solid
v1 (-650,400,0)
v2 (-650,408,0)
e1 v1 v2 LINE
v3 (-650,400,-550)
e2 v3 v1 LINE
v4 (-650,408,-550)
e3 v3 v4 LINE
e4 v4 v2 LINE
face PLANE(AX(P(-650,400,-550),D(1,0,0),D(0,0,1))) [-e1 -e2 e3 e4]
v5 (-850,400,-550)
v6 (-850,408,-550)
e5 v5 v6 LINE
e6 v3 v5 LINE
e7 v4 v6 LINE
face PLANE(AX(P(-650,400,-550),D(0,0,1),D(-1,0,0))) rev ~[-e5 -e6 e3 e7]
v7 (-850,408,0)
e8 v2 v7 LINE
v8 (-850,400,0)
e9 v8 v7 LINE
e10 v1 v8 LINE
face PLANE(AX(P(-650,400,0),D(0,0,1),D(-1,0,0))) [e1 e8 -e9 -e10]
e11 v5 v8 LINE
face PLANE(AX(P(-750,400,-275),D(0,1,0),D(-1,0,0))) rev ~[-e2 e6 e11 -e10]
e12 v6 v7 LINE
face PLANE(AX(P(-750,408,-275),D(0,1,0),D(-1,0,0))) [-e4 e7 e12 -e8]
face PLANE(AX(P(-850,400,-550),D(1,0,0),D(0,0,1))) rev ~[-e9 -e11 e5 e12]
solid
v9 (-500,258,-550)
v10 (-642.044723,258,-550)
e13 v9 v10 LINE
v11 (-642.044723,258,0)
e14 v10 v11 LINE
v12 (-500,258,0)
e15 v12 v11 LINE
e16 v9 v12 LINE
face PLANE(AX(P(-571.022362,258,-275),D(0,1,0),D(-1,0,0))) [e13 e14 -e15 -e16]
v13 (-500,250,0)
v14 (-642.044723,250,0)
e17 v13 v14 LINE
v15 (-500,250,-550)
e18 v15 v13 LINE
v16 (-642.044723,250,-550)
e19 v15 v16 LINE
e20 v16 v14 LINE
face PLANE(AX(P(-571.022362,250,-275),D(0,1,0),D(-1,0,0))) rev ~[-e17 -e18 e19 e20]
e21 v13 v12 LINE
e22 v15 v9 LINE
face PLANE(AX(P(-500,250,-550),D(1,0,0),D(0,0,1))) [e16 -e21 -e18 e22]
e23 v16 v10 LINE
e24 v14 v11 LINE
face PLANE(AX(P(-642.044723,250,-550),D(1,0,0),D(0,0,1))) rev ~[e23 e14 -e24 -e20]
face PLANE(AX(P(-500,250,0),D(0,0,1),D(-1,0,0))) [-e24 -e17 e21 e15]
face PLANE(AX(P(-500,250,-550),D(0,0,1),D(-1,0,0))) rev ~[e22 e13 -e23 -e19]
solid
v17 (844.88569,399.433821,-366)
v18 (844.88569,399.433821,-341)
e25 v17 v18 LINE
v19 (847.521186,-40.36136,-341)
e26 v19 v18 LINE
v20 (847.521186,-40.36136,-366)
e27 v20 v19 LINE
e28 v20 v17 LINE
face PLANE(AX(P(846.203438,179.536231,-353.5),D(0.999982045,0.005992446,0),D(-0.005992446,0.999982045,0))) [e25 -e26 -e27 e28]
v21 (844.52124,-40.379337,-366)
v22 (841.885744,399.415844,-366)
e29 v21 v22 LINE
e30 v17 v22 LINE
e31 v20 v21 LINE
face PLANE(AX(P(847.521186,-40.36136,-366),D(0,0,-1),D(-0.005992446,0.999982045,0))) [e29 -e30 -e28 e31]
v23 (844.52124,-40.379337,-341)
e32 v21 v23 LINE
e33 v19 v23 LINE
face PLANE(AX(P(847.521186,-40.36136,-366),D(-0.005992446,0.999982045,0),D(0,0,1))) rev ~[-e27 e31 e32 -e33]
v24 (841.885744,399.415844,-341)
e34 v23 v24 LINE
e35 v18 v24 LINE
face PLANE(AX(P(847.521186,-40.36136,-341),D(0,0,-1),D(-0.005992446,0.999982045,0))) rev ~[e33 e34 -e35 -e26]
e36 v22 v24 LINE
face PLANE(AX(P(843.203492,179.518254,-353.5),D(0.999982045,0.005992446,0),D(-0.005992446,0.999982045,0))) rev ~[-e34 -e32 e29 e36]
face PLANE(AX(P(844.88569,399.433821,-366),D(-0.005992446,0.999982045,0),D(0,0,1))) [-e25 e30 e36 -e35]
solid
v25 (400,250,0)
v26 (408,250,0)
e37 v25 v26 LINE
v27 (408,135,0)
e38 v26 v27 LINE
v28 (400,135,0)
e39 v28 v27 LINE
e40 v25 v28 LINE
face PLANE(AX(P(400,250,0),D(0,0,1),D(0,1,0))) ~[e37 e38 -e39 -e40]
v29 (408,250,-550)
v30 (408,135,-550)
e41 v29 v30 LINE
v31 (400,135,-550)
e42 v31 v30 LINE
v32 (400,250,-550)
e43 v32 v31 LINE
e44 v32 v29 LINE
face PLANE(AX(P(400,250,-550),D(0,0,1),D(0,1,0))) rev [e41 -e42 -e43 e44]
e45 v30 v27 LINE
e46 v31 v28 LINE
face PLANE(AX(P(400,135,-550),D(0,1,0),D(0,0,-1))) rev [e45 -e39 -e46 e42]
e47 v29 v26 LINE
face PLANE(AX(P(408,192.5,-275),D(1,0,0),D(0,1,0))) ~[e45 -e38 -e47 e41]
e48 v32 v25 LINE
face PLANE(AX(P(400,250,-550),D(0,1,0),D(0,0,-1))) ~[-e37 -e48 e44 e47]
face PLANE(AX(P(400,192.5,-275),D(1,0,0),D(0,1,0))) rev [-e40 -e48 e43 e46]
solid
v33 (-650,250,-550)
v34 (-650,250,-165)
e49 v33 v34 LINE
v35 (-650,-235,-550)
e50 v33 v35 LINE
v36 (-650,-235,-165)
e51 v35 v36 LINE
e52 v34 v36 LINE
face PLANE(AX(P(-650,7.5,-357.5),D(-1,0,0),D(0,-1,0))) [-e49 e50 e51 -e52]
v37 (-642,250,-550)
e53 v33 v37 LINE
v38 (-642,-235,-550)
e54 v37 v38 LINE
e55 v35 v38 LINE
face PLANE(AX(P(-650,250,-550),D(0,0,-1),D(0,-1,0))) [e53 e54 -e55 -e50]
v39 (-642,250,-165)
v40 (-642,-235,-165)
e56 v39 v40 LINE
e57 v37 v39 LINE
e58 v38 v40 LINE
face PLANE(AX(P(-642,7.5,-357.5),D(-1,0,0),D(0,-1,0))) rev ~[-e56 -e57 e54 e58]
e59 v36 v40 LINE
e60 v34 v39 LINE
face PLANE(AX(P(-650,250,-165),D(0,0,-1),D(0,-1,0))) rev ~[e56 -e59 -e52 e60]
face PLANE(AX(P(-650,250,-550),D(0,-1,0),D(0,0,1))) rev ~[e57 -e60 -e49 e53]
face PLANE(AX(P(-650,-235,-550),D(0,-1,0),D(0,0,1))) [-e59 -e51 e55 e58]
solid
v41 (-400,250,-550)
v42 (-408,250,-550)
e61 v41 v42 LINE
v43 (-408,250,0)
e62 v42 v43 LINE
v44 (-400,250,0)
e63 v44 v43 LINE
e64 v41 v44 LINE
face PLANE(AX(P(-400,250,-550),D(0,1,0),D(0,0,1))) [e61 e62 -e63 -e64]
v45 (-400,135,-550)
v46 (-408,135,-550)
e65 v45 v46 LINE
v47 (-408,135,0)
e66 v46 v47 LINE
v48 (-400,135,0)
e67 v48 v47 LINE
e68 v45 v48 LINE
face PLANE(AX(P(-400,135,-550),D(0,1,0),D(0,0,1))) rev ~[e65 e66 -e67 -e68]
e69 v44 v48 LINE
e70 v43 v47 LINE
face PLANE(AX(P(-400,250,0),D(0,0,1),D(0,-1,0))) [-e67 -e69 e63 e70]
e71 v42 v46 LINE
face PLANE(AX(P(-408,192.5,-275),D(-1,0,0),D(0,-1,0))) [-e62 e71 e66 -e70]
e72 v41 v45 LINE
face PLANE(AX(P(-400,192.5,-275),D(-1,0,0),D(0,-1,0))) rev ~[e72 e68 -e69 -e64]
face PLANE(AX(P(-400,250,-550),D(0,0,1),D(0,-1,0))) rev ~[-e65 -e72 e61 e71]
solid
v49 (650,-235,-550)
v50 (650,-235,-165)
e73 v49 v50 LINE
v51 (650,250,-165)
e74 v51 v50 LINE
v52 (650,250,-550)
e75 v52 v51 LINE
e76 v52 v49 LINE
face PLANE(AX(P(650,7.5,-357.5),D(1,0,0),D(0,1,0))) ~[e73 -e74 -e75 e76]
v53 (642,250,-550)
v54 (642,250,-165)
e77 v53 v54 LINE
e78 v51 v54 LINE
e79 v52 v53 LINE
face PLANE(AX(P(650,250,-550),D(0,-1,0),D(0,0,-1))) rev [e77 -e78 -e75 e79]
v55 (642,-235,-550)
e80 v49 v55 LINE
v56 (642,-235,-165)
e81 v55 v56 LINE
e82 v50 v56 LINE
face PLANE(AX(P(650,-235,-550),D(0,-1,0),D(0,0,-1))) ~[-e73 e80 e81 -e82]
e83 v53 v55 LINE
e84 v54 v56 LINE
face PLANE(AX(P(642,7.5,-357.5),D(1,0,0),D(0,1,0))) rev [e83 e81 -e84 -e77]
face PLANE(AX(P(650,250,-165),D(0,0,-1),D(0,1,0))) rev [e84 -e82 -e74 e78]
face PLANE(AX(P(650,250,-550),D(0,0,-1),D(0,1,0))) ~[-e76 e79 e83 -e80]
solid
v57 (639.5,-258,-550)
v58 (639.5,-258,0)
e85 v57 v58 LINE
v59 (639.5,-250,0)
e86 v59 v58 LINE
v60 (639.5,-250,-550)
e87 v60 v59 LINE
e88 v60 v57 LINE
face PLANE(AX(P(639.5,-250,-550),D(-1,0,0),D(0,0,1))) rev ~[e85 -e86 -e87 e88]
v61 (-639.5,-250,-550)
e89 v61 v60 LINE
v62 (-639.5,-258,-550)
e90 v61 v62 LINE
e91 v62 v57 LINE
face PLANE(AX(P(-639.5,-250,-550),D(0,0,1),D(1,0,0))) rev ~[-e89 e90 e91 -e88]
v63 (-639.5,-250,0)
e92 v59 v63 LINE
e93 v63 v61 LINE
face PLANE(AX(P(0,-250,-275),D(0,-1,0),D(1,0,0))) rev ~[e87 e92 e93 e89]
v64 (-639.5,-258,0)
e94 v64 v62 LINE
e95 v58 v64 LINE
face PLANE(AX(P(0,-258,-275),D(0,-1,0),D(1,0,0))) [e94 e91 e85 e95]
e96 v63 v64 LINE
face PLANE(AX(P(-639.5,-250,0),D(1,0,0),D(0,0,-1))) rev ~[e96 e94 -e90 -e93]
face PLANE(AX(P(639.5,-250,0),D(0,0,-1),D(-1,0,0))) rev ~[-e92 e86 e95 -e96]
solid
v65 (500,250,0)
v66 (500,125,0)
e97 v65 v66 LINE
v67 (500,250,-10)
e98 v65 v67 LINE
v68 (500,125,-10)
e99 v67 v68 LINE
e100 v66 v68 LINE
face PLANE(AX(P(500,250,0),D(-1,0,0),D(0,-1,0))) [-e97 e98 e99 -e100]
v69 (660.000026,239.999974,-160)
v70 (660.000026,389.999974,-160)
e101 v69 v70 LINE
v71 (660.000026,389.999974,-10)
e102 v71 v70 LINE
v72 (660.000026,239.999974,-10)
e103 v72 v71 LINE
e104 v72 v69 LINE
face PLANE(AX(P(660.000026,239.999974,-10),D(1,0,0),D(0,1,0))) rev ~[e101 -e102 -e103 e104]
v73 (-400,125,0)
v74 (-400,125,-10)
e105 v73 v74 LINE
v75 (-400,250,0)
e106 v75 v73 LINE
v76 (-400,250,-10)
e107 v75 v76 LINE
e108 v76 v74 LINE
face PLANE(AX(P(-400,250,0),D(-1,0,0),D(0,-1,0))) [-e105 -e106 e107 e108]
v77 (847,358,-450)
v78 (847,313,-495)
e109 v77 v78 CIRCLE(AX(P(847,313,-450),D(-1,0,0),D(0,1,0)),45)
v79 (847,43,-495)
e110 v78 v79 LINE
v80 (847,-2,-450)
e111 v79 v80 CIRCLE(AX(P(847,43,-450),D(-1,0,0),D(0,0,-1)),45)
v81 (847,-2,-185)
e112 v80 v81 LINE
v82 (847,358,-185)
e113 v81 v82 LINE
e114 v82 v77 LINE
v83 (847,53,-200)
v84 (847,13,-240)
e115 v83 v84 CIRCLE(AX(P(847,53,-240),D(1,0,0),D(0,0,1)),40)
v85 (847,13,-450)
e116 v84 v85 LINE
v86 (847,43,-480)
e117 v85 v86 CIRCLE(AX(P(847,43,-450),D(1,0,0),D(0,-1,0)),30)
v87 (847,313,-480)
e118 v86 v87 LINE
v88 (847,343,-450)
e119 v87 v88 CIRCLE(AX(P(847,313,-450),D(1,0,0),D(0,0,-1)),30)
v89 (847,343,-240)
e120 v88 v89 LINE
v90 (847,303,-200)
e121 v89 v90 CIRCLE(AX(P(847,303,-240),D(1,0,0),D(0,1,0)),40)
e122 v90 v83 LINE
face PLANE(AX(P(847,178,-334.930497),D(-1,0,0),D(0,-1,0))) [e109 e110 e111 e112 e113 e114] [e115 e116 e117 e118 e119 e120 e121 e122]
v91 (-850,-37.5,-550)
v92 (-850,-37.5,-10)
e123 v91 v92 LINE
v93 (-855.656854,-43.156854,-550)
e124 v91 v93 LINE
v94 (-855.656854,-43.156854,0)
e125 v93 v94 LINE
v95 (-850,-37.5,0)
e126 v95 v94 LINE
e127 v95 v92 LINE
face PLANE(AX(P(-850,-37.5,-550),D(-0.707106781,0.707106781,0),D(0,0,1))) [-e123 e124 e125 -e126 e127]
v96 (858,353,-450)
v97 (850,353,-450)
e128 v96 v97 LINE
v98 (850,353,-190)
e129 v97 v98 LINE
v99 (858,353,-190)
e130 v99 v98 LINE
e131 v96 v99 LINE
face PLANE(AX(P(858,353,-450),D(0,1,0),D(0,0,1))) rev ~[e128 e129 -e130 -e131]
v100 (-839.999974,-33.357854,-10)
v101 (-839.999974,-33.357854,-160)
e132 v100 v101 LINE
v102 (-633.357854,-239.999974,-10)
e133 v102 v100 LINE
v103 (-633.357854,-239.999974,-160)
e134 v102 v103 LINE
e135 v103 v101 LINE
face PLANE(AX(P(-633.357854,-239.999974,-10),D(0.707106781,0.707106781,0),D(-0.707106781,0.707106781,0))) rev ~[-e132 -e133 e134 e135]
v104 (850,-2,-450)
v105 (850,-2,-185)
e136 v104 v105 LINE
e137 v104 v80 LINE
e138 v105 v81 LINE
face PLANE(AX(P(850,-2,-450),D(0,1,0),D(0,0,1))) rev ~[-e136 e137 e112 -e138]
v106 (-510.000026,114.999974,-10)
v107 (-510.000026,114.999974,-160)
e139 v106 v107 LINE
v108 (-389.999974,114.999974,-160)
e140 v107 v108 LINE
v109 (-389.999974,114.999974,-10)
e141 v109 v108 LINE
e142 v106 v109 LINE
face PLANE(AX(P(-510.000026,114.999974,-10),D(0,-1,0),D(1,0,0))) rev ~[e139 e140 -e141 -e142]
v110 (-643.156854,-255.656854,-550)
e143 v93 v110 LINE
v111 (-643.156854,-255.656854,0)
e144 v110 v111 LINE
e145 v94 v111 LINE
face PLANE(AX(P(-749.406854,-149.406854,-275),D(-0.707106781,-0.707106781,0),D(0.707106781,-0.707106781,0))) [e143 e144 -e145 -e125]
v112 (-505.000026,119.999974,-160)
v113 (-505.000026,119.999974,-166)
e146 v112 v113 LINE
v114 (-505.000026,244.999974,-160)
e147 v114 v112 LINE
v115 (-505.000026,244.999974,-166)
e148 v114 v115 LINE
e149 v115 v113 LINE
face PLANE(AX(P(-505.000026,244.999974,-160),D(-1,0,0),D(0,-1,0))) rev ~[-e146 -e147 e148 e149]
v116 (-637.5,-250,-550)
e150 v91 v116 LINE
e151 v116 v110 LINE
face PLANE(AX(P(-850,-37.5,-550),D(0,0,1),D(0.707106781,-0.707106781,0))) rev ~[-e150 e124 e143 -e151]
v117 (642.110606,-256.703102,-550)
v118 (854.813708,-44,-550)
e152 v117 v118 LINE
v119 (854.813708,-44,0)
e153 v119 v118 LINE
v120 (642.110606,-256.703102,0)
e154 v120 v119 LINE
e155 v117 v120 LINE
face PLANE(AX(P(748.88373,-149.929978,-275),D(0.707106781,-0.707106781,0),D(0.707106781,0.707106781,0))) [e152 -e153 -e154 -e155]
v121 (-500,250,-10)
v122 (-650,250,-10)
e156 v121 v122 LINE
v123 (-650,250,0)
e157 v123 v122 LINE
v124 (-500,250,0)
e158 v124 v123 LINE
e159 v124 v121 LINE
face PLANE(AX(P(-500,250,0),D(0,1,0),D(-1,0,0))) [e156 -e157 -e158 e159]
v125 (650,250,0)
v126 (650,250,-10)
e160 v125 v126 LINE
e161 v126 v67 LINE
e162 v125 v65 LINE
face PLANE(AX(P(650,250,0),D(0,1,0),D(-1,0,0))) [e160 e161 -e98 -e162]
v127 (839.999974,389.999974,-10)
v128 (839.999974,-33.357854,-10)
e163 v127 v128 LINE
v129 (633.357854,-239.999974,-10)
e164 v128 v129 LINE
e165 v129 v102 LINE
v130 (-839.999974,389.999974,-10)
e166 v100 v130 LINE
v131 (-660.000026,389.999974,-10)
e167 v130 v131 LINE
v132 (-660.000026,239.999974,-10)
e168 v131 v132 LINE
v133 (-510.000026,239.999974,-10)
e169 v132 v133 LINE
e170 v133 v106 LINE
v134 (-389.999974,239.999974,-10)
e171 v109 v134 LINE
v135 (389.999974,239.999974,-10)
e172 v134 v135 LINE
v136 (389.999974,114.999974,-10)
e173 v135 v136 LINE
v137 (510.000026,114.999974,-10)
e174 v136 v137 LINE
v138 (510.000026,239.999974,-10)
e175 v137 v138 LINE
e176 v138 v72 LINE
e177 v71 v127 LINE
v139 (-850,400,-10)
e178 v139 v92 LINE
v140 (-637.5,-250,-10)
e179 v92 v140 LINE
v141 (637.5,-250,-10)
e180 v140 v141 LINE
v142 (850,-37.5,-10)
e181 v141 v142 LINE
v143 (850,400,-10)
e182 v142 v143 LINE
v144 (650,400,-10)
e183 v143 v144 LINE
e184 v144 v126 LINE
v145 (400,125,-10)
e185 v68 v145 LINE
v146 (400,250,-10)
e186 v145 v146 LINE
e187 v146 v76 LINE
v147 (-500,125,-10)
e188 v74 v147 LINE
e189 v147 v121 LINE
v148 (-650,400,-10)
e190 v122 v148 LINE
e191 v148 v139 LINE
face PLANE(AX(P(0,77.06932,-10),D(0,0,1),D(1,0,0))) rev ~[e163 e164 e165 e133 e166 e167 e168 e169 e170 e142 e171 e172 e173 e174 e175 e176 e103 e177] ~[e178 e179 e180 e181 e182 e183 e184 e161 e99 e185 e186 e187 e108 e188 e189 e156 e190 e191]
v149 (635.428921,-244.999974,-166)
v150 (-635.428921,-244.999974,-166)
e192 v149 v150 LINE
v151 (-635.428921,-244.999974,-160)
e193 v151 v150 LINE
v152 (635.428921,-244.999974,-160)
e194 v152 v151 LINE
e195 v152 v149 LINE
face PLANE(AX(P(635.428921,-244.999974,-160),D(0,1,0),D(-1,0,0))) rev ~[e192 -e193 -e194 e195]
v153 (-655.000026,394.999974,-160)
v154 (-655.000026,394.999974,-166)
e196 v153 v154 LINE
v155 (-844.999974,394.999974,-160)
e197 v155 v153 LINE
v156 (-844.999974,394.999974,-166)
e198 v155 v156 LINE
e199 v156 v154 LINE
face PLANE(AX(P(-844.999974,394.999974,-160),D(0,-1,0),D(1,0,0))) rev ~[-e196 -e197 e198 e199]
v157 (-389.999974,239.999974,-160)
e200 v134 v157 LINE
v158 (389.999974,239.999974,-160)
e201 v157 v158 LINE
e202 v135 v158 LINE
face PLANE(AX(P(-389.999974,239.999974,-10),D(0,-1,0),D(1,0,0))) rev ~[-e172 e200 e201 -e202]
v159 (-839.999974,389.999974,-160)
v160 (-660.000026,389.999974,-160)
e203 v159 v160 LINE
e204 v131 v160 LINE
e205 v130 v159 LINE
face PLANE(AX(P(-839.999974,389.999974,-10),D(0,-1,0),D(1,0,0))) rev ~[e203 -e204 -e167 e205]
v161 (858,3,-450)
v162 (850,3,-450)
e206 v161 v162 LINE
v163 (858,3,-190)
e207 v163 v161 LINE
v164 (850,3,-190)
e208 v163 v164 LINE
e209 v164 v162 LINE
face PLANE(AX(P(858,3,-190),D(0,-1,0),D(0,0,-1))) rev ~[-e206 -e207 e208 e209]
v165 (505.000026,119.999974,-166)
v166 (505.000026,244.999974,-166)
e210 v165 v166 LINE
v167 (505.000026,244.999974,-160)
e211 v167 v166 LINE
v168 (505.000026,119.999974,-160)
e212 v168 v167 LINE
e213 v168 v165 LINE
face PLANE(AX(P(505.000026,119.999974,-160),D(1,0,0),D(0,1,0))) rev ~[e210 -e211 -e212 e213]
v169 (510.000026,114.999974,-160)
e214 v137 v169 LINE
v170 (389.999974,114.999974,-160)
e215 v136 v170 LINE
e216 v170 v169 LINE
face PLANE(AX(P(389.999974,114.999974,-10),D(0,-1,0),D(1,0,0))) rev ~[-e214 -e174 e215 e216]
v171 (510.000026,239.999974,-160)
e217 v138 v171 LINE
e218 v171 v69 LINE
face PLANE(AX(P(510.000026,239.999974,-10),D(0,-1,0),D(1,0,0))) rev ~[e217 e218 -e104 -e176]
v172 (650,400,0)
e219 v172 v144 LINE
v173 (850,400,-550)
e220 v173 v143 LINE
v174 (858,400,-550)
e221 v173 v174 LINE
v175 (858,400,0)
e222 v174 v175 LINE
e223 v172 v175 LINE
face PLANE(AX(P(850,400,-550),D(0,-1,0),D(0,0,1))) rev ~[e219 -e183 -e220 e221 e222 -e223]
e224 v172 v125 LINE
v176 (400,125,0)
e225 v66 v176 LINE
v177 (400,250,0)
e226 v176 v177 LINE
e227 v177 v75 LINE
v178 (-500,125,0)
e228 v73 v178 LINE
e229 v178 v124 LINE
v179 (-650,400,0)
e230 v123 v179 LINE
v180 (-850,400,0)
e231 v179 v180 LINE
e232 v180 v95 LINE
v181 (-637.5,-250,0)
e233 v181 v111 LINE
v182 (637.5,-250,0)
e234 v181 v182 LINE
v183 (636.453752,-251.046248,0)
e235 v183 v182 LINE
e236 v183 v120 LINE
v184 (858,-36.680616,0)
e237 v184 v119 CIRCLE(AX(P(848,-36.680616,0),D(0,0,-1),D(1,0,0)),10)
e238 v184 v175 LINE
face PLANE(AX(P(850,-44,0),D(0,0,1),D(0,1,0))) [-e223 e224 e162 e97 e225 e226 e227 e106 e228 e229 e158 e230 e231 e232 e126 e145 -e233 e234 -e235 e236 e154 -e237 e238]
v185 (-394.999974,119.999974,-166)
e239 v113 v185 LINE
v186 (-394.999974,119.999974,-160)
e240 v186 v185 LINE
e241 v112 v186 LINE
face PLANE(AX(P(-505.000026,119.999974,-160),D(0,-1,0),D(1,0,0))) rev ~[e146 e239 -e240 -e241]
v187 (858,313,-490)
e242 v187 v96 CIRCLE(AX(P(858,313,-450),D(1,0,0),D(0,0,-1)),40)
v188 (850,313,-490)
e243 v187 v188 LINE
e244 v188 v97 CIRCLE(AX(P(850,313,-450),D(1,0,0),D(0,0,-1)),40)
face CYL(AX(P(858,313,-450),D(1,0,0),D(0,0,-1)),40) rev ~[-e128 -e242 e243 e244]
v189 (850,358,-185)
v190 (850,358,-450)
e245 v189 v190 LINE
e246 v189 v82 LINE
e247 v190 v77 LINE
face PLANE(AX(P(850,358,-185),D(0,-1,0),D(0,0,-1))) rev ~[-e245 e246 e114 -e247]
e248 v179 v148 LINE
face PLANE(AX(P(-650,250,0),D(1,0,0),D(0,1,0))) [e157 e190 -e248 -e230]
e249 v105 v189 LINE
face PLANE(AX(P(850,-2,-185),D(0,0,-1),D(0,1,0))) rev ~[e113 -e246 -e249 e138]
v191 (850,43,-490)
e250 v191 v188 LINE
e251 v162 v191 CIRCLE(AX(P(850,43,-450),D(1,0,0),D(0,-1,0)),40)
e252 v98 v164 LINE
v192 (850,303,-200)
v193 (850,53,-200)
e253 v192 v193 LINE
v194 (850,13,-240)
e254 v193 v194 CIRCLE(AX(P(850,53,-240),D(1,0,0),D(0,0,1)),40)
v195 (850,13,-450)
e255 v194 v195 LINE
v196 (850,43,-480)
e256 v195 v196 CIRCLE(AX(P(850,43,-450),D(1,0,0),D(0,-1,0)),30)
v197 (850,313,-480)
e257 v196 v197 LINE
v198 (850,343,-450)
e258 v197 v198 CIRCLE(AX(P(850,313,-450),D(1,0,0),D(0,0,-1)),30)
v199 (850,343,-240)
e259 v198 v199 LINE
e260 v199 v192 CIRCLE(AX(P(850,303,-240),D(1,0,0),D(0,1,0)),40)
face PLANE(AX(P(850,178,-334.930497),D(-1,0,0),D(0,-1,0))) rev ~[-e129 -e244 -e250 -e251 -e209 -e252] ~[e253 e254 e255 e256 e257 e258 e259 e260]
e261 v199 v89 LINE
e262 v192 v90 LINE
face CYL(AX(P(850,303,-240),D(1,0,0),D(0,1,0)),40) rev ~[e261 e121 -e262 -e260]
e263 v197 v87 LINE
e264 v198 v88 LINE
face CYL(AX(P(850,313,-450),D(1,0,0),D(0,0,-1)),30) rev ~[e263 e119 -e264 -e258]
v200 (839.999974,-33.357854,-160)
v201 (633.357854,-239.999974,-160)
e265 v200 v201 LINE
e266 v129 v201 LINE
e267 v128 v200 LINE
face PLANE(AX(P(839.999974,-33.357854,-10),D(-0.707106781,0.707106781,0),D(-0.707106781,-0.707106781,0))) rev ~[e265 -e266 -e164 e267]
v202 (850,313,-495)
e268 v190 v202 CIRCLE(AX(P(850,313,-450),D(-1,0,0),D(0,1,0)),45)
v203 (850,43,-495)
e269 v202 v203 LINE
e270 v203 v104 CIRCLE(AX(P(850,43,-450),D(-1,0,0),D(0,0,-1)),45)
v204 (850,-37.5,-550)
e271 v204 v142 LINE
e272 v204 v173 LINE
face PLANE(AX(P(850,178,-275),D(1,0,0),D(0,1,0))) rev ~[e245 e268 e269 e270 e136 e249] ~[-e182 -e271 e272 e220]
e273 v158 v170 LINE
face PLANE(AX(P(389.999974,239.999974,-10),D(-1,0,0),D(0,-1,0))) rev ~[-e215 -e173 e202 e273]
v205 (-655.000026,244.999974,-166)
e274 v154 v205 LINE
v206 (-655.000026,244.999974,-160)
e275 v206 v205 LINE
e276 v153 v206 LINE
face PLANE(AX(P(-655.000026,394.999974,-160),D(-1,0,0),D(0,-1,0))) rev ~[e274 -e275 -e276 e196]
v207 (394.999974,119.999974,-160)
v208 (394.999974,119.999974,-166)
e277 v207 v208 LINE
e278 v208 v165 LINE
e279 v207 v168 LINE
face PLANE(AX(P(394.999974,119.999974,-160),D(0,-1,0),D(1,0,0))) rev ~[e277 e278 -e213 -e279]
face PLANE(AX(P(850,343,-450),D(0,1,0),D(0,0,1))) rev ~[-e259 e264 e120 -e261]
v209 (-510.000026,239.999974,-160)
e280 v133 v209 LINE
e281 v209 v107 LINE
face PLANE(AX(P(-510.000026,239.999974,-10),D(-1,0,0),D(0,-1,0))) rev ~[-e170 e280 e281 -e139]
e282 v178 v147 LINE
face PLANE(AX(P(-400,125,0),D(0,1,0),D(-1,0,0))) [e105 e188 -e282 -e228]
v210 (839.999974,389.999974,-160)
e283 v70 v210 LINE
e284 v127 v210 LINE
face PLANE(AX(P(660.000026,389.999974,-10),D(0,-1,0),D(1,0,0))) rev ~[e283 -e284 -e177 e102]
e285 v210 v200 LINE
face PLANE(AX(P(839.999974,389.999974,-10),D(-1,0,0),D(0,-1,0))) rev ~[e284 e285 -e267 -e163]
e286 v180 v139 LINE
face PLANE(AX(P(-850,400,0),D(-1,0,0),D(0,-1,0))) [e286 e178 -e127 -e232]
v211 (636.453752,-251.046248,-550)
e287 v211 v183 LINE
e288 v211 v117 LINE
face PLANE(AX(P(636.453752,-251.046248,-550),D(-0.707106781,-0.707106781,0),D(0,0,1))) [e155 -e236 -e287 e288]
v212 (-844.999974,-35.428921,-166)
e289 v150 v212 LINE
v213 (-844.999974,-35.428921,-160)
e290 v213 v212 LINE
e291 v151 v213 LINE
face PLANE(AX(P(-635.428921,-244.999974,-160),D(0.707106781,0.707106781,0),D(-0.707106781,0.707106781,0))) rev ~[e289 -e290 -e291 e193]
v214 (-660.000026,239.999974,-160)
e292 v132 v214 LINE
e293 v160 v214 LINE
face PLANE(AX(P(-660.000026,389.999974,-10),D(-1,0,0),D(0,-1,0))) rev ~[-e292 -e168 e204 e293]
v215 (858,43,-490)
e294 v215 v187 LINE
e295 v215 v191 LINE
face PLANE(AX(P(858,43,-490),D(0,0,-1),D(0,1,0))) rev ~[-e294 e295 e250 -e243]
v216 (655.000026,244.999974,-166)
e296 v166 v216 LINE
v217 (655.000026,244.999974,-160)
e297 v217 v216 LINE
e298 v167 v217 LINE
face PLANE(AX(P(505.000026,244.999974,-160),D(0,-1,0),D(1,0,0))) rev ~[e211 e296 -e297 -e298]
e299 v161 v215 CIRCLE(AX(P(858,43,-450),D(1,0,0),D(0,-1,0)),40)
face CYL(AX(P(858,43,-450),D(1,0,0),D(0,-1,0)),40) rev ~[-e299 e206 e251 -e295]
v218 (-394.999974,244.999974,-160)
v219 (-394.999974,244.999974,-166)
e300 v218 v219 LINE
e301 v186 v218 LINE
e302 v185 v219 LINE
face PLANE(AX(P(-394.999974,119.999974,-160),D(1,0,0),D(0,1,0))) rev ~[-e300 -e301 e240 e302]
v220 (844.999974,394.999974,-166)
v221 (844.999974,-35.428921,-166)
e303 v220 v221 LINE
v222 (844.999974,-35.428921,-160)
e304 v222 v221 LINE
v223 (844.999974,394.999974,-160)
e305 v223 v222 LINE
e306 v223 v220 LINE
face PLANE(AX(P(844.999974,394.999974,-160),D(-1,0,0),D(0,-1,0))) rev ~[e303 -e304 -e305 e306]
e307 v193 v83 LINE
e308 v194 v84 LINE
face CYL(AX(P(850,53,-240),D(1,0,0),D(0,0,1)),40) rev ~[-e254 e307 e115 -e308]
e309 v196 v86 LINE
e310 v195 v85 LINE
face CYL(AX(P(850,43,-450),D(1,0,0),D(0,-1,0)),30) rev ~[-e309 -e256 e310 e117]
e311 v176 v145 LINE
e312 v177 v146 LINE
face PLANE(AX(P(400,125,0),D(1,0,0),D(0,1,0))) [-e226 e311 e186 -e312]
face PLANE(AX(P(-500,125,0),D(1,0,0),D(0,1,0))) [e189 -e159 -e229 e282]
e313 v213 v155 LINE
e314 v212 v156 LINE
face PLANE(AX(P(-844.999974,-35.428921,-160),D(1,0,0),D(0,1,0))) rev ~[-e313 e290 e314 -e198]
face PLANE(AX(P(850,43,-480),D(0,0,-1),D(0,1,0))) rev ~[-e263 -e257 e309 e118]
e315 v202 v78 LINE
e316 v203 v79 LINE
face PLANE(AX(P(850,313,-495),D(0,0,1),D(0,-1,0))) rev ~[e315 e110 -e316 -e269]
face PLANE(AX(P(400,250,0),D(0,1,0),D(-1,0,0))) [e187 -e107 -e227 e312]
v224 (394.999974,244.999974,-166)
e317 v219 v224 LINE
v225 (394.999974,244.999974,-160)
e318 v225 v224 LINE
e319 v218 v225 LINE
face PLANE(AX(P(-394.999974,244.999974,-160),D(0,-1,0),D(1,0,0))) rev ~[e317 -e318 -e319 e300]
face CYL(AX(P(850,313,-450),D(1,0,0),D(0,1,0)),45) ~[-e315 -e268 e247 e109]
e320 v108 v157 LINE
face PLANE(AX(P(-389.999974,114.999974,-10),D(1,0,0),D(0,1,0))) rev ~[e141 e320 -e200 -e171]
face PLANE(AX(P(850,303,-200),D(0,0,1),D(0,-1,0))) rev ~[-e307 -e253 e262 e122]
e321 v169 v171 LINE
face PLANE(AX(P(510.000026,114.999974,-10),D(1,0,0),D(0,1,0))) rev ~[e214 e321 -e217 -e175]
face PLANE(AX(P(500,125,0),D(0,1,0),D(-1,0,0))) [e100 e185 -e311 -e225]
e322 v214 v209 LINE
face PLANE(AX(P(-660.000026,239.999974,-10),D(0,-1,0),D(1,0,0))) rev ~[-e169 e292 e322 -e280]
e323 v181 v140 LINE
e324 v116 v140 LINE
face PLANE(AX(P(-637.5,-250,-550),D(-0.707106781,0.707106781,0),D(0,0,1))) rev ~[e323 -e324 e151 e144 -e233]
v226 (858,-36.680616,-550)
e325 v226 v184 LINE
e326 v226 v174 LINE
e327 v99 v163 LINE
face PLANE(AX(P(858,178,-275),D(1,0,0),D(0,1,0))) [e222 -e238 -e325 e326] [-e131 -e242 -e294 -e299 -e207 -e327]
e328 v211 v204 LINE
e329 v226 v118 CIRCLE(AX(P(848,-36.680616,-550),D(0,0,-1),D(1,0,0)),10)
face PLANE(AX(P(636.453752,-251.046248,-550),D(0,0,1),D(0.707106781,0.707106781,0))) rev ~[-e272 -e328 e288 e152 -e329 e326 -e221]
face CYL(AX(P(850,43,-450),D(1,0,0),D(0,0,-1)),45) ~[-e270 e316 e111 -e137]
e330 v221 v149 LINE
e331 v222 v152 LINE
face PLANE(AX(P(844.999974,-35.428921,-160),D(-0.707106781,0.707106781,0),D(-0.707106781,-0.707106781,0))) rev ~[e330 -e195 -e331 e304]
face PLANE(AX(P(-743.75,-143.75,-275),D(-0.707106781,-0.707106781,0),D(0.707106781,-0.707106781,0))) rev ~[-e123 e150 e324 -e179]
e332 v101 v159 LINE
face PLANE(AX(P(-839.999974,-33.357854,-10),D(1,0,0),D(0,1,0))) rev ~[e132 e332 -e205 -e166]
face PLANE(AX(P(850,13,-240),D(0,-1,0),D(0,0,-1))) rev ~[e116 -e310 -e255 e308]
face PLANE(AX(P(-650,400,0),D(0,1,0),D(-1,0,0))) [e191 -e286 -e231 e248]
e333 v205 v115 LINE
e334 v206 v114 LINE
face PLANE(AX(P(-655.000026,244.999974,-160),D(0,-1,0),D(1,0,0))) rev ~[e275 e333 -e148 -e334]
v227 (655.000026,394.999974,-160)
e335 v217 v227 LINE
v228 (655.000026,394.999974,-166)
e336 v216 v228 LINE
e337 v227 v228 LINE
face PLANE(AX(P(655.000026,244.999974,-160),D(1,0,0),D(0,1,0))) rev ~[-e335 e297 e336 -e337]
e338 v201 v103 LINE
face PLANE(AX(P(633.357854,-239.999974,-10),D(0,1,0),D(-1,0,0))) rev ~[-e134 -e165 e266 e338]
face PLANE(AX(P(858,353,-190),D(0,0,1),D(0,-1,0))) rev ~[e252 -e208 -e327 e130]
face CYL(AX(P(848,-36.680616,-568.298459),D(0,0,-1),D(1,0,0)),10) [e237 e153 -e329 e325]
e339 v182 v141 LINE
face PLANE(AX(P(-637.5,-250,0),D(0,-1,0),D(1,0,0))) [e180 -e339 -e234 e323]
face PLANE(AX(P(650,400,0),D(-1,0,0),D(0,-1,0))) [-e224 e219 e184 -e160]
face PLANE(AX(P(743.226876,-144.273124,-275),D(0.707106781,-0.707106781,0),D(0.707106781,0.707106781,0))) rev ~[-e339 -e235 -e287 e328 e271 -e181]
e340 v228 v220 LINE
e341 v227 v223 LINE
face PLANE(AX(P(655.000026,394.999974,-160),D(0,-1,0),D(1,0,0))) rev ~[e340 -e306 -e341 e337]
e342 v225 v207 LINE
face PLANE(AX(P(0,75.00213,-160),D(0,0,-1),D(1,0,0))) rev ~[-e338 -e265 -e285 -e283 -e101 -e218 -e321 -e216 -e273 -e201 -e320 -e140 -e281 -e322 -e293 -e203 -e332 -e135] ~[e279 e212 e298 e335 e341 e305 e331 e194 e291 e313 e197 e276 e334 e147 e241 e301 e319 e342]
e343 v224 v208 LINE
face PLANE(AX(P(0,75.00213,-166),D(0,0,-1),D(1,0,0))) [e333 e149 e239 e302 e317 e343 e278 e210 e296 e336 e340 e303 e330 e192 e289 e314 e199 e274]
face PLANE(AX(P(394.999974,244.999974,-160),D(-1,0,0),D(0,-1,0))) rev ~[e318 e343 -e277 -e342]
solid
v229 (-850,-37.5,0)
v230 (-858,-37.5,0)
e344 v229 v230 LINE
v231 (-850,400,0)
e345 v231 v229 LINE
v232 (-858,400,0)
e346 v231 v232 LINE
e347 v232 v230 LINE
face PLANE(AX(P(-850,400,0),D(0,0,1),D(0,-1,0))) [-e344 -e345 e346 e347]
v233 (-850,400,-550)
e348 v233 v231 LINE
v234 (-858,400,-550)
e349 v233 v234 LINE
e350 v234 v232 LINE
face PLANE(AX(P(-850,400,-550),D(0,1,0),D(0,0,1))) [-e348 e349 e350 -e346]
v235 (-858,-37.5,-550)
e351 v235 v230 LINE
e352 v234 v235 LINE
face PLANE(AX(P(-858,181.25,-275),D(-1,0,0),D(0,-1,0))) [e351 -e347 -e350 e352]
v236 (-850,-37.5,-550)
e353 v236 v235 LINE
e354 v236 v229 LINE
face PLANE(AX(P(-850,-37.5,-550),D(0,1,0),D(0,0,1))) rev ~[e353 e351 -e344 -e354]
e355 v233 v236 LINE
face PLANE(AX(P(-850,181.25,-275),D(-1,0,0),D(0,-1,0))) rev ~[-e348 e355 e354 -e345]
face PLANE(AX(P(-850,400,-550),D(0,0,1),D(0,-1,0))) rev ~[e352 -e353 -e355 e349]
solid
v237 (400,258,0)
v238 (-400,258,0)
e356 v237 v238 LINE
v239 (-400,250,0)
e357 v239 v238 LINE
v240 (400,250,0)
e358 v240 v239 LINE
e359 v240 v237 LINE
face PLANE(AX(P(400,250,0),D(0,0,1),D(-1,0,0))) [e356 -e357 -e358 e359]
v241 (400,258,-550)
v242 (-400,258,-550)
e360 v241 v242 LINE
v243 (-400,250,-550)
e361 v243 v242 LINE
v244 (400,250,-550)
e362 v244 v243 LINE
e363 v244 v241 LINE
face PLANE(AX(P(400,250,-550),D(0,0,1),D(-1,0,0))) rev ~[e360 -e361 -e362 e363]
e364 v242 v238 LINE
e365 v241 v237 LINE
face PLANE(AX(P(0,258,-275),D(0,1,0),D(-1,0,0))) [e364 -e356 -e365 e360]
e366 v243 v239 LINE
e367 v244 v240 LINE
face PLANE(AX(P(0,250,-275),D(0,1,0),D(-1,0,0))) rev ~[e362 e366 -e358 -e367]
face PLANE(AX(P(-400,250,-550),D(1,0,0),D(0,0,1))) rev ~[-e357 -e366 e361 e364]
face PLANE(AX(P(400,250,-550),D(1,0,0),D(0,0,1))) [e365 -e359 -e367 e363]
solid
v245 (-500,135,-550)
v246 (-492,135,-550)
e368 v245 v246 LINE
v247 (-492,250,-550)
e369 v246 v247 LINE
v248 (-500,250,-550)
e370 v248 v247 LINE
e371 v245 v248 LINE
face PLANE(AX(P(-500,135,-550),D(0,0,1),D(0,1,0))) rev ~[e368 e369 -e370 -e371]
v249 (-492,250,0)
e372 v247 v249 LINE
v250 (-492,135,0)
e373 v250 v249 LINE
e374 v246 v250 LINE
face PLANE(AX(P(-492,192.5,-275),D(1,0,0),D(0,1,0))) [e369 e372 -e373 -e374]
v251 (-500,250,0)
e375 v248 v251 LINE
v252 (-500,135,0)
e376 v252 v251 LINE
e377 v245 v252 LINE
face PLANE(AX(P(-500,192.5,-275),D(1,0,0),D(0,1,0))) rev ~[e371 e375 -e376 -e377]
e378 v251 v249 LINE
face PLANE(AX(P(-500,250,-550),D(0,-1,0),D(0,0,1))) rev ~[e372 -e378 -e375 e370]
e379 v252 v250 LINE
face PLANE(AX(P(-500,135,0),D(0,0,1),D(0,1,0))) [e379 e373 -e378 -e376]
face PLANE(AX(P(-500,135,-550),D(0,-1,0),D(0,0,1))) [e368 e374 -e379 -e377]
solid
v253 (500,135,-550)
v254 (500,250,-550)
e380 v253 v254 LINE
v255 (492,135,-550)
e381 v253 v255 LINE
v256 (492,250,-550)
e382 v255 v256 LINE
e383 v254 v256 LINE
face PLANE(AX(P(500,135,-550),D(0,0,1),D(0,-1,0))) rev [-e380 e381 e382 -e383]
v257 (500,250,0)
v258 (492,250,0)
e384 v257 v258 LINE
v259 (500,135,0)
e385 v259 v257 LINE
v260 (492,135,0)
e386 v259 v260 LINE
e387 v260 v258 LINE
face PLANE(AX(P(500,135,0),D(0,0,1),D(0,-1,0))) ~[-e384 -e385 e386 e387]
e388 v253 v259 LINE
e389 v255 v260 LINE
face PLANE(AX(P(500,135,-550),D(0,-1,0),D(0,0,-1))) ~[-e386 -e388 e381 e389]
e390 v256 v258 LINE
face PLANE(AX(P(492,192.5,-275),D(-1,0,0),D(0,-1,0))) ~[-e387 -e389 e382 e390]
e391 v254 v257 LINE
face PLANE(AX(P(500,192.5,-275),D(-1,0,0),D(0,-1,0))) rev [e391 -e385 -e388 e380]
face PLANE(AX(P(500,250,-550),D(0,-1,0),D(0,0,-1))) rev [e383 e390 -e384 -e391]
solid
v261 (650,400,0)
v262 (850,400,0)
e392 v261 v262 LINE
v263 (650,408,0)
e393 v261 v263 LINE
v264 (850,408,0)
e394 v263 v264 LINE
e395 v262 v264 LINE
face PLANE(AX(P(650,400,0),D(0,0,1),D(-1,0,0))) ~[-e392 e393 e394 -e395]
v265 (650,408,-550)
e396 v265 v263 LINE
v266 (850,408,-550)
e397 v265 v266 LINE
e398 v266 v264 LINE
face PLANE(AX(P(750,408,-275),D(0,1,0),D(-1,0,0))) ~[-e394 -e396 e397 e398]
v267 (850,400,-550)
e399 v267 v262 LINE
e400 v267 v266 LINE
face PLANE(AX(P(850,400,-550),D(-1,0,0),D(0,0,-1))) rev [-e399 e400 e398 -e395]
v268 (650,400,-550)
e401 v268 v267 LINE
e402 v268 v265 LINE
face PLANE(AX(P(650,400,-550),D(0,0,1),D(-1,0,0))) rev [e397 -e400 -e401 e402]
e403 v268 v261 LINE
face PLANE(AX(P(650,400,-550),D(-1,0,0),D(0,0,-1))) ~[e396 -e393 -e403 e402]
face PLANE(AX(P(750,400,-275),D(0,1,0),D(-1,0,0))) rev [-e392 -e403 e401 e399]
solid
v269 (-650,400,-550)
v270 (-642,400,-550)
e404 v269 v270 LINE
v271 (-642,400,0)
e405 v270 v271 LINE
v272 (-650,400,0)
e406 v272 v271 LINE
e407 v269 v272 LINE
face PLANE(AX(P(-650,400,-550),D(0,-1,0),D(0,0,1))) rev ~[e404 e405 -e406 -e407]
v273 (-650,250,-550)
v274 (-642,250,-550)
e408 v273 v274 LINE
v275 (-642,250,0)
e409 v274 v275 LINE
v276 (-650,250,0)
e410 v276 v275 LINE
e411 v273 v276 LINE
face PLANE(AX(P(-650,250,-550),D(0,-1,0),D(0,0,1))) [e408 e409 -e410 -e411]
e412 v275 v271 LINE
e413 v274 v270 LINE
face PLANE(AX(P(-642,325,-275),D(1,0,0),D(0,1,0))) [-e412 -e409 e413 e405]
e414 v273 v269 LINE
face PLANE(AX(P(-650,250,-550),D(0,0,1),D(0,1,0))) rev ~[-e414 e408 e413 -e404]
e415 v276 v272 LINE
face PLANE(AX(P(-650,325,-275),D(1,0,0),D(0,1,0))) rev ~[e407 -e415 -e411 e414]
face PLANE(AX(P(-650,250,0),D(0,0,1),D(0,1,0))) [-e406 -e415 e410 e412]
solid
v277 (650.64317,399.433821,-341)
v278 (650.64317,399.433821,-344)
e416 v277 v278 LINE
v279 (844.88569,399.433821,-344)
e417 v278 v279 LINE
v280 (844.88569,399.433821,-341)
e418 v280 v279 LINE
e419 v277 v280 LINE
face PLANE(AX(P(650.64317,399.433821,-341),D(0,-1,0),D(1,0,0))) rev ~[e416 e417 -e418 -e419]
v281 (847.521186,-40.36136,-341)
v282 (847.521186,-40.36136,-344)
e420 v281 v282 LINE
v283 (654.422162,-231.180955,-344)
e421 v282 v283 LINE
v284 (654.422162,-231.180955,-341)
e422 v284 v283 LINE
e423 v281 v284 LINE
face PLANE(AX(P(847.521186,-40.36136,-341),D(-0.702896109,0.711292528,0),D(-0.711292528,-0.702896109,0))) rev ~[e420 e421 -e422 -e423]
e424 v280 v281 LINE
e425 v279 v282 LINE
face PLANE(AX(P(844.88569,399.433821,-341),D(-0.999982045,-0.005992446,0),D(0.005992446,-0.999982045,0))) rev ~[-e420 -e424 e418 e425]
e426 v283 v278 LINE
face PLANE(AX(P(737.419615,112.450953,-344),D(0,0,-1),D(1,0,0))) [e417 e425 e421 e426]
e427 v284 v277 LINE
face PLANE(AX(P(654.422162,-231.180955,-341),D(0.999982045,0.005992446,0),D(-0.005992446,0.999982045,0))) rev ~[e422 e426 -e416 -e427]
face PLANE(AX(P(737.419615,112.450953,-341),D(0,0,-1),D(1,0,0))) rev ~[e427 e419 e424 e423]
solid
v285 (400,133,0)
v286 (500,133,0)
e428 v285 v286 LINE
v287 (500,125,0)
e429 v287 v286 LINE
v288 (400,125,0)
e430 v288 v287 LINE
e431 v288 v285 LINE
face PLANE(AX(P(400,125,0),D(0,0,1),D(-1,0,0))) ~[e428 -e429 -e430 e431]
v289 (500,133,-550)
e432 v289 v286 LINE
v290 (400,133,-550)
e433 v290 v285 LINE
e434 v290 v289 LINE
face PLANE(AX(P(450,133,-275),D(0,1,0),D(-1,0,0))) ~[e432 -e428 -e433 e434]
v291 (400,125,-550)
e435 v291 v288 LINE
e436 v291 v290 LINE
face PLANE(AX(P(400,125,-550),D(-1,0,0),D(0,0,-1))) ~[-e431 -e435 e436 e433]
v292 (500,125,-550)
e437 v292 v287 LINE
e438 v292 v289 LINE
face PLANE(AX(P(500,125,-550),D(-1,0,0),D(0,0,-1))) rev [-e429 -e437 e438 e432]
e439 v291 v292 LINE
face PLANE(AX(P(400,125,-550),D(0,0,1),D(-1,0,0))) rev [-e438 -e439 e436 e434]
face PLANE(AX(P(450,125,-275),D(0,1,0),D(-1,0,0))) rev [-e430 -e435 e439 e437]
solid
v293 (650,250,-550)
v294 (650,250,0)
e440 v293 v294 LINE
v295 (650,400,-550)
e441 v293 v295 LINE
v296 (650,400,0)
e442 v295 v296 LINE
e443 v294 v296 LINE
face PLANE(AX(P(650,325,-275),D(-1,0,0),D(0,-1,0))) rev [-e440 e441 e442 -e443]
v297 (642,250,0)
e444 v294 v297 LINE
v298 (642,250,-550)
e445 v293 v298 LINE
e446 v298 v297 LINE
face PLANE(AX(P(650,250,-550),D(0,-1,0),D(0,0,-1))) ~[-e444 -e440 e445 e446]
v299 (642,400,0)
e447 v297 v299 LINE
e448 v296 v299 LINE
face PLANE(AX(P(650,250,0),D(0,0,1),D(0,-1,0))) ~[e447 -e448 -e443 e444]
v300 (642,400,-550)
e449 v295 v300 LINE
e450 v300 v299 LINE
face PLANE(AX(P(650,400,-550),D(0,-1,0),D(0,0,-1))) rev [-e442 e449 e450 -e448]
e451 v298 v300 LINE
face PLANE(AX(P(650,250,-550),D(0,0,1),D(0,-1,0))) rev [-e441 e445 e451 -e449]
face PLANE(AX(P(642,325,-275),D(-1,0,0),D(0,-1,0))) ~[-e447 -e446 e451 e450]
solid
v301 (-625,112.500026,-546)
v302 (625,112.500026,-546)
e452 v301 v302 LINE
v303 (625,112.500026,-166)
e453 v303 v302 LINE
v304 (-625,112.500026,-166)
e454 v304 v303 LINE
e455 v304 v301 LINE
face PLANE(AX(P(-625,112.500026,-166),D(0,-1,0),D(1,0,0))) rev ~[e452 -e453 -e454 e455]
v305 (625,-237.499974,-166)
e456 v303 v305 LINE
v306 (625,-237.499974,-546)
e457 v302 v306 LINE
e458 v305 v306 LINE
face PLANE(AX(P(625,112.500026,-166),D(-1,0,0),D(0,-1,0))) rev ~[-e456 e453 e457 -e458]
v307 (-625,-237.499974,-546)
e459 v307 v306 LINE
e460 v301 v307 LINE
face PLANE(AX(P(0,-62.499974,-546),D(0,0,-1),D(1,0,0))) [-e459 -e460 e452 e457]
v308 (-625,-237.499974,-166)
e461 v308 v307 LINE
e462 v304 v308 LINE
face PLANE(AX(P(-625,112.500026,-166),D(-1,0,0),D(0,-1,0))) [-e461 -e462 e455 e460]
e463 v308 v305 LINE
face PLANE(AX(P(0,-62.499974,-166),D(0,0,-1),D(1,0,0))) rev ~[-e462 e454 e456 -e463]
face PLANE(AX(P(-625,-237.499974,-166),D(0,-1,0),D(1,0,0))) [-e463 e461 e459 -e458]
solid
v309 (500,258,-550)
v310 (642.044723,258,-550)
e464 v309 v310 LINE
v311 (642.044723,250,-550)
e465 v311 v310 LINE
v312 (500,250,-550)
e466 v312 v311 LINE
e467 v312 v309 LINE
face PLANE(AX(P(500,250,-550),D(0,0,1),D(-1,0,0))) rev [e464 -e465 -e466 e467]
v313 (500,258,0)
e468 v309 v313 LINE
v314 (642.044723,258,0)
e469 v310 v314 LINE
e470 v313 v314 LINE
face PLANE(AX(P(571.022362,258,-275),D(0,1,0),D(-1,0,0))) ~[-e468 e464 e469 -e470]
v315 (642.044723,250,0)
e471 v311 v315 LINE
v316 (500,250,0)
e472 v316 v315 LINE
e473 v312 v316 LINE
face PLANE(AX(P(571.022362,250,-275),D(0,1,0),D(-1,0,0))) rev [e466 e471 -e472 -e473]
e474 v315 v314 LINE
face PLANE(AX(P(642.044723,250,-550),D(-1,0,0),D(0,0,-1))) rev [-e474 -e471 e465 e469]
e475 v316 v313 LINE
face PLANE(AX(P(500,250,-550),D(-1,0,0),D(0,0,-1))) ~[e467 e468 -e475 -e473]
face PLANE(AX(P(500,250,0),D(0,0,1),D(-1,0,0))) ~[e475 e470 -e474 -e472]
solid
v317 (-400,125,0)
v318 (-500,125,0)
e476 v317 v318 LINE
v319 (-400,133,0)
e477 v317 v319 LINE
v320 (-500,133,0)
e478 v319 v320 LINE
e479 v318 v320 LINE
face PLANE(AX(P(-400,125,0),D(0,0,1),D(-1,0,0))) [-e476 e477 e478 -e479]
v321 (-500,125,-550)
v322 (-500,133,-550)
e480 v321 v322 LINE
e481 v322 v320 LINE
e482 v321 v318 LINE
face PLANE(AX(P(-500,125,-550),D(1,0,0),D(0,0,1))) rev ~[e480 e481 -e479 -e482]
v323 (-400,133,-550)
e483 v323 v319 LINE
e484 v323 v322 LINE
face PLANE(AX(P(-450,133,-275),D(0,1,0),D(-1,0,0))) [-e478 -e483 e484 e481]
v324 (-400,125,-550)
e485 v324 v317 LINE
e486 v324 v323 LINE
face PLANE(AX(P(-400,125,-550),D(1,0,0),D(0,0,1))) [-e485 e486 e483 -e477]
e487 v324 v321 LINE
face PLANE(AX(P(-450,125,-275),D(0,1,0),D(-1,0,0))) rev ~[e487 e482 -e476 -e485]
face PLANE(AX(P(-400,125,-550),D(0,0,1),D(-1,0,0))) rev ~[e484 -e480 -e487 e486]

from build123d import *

# Parameters (mm, degrees)
F1_DEPTH     = 10
F3_DEPTH     = 150
F5_DEPTH     = 6
F6_W         = 437.5
F6_H         = 550
F7_DEPTH     = 8
F8_W         = 300.5203820043
F8_H         = 550
F9_DEPTH     = 8
F11_DEPTH    = 8
F12_W        = 302
F12_H        = 550
F13_DEPTH    = 8
F14_W        = 444
F14_H        = 550
F15_DEPTH    = 8
F16_W        = 200
F16_H        = 550
F17_DEPTH    = 8
F18_W        = 150
F18_H        = 550
F19_DEPTH    = 8
F20_W        = 142.0447230339
F20_H        = 550
F21_DEPTH    = 8
F22_W        = 100
F22_H        = 550
F23_DEPTH    = 8
F24_W        = 115
F24_H        = 550
F25_DEPTH    = 8
F26_W        = 115
F26_H        = 550
F27_DEPTH    = 8
F29_W        = 800
F29_H        = 550
F30_DEPTH    = 8
F31_W        = 485
F31_H        = 385
F32_DEPTH    = 8
F35_DEPTH    = 25
F37_DEPTH    = 3
F40_DEPTH    = 3
F41_W        = 439.8030777591
F41_H        = 25
F42_DEPTH    = 3
F43_W        = 1250
F43_H        = 350
F44_DEPTH    = 380
F45_T1_DEPTH = 586.5969180707


# Not quite as in the source:
# - a fillet or chamfer that OpenCascade refuses, or shapes differently, is made with other operations: its cross-section is extruded or revolved along the edge and cut away or added


with BuildPart() as f1:
    # F0 (on Top) → F1 (new body)
    with BuildSketch(Plane.XY):
        Polygon((650, 400), (650, 250), (500, 250), (500, 125), (400, 125), (400, 250), (-400, 250), (-400, 125), (-500, 125), (-500, 250), (-650, 250), (-650, 400), (-850, 400), (-850, 250), (-850, -37.5), (-637.5, -250), (637.5, -250), (850, -37.5), (850, 250), (850, 400), align=None)
    extrude(amount=-F1_DEPTH)

    # F2 (on face) → F3 (join)
    with BuildSketch(Plane(origin=(0, 0, -10), x_dir=(1, 0, 0), z_dir=(0, 0, -1))):
        Polygon((633.3578535131, 239.999973774), (-633.3578535131, 239.999973774), (-839.999973774, 33.3578535131), (-839.999973774, -389.999973774), (-660.000026226, -389.999973774), (-660.000026226, -239.999973774), (-510.000026226, -239.999973774), (-510.000026226, -114.999973774), (-389.999973774, -114.999973774), (-389.999973774, -239.999973774), (389.999973774, -239.999973774), (389.999973774, -114.999973774), (510.000026226, -114.999973774), (510.000026226, -239.999973774), (660.000026226, -239.999973774), (660.000026226, -389.999973774), (839.999973774, -389.999973774), (839.999973774, 33.3578535131), align=None)
    extrude(amount=F3_DEPTH)

    # F4 (on face) → F5 (join)
    with BuildSketch(Plane(origin=(0, 0, -160), x_dir=(1, 0, 0), z_dir=(0, 0, -1))):
        Polygon((844.999973774, -394.999973774), (844.999973774, 35.428921325), (635.428921325, 244.999973774), (-635.428921325, 244.999973774), (-844.999973774, 35.428921325), (-844.999973774, -394.999973774), (-655.000026226, -394.999973774), (-655.000026226, -244.999973774), (-505.000026226, -244.999973774), (-505.000026226, -119.999973774), (-394.999973774, -119.999973774), (-394.999973774, -244.999973774), (394.999973774, -244.999973774), (394.999973774, -119.999973774), (505.000026226, -119.999973774), (505.000026226, -244.999973774), (655.000026226, -244.999973774), (655.000026226, -394.999973774), align=None)
    extrude(amount=F5_DEPTH)

    # F8 (on face) → F9 (join)
    with BuildSketch(Plane(origin=(-443.75, -443.75, 0), x_dir=(0.7071067812, -0.7071067812, 0), z_dir=(-0.7071067812, -0.7071067812, 0))):
        with Locations((-424.2640687119, -275)):
            Rectangle(F8_W, F8_H)
    extrude(amount=F9_DEPTH)

    # F12 (on face) → F13 (join)
    with BuildSketch(Plane(origin=(443.75, -443.75, 0), x_dir=(0.7071067812, 0.7071067812, 0), z_dir=(0.7071067812, -0.7071067812, 0))):
        with Locations((423.5242597141, -275)):
            Rectangle(F12_W, F12_H)
    extrude(amount=F13_DEPTH)

    # F14 (on face) → F15 (join)
    with BuildSketch(Plane.YZ.offset(850)):
        with Locations((178, -275)):
            Rectangle(F14_W, F14_H)
    extrude(amount=F15_DEPTH)

    # F34 (on face) → F35 (cut)
    with BuildSketch(Plane.YZ.offset(858)):
        with BuildLine():
            ThreePointArc((3, -450), (14.7157287525, -478.2842712475), (43, -490))
            Line((43, -490), (313, -490))
            ThreePointArc((313, -490), (341.2842712475, -478.2842712475), (353, -450))
            Line((353, -450), (353, -190))
            Line((353, -190), (3, -190))
            Line((3, -190), (3, -450))
        make_face()
    extrude(amount=-F35_DEPTH, mode=Mode.SUBTRACT)

    # F36 (on face) → F37 (join)
    with BuildSketch(Plane(origin=(850, 0, 0), x_dir=(0, -1, 0), z_dir=(-1, 0, 0))):
        with BuildLine():
            ThreePointArc((-43, -495), (-11.1801948466, -481.8198051534), (2, -450))
            Line((2, -450), (2, -185))
            Line((2, -185), (-358, -185))
            Line((-358, -185), (-358, -450))
            ThreePointArc((-358, -450), (-344.8198051534, -481.8198051534), (-313, -495))
            Line((-313, -495), (-43, -495))
        make_face()
        with BuildLine():
            Line((-13, -240), (-13, -450))
            ThreePointArc((-13, -450), (-21.7867965644, -471.2132034356), (-43, -480))
            Line((-43, -480), (-313, -480))
            ThreePointArc((-313, -480), (-334.2132034356, -471.2132034356), (-343, -450))
            Line((-343, -450), (-343, -240))
            ThreePointArc((-343, -240), (-331.2842712475, -211.7157287525), (-303, -200))
            Line((-303, -200), (-53, -200))
            ThreePointArc((-53, -200), (-24.7157287525, -211.7157287525), (-13, -240))
        make_face(mode=Mode.SUBTRACT)
    extrude(amount=F37_DEPTH)

    # F45: fillet of radius 10 on 1 edges, made by hand

    # F45_s2 → F45_t1 (cut)
    with BuildSketch(Plane.XY.offset(-568.2984590353)):
        with BuildLine():
            ThreePointArc((858, -36.6806163859), (857.1688899271, -40.6720393784), (854.813708499, -44))
            Line((854.813708499, -44), (858, -44))
            Line((858, -44), (858, -36.6806163859))
        make_face()
    extrude(amount=F45_T1_DEPTH, mode=Mode.SUBTRACT)


with BuildPart() as f7:
    # F6 (on face) → F7 (new body)
    with BuildSketch(Plane(origin=(-850, 0, 0), x_dir=(0, -1, 0), z_dir=(-1, 0, 0))):
        with Locations((-181.25, -275)):
            Rectangle(F6_W, F6_H)
    extrude(amount=F7_DEPTH)


with BuildPart() as f11:
    # F10 (on face) → F11 (new body)
    with BuildSketch(Plane.XZ.offset(250)):
        Polygon((-637.5, 0), (-639.5, 0), (-639.5, -550), (639.5, -550), (639.5, 0), (637.5, 0), (635.5, 0), align=None)
    extrude(amount=F11_DEPTH)


with BuildPart() as f17:
    # F16 (on face) → F17 (new body)
    with BuildSketch(Plane(origin=(0, 400, 0), x_dir=(-1, 0, 0), z_dir=(0, 1, 0))):
        with Locations((750, -275)):
            Rectangle(F16_W, F16_H)
    extrude(amount=F17_DEPTH)


with BuildPart() as f19:
    # F18 (on face) → F19 (new body)
    with BuildSketch(Plane.YZ.offset(-650)):
        with Locations((325, -275)):
            Rectangle(F18_W, F18_H)
    extrude(amount=F19_DEPTH)


with BuildPart() as f21:
    # F20 (on face) → F21 (new body)
    with BuildSketch(Plane(origin=(0, 250, 0), x_dir=(-1, 0, 0), z_dir=(0, 1, 0))):
        with Locations((571.022361517, -275)):
            Rectangle(F20_W, F20_H)
    extrude(amount=F21_DEPTH)


with BuildPart() as f23:
    # F22 (on face) → F23 (new body)
    with BuildSketch(Plane(origin=(0, 125, 0), x_dir=(-1, 0, 0), z_dir=(0, 1, 0))):
        with Locations((450, -275)):
            Rectangle(F22_W, F22_H)
    extrude(amount=F23_DEPTH)


with BuildPart() as f25:
    # F24 (on face) → F25 (new body)
    with BuildSketch(Plane.YZ.offset(-500)):
        with Locations((192.5, -275)):
            Rectangle(F24_W, F24_H)
    extrude(amount=F25_DEPTH)


with BuildPart() as f27:
    # F26 (on face) → F27 (new body)
    with BuildSketch(Plane(origin=(-400, 0, 0), x_dir=(0, -1, 0), z_dir=(-1, 0, 0))):
        with Locations((-192.5, -275)):
            Rectangle(F26_W, F26_H)
    extrude(amount=F27_DEPTH)


with BuildPart() as f28_1:
    # F28: instance of F17
    add(f17.part.mirror(Plane.YZ))


with BuildPart() as f28_2:
    # F28: instance of F19
    add(f19.part.mirror(Plane.YZ))


with BuildPart() as f28_3:
    # F28: instance of F21
    add(f21.part.mirror(Plane.YZ))


with BuildPart() as f28_4:
    # F28: instance of F25
    add(f25.part.mirror(Plane.YZ))


with BuildPart() as f28_5:
    # F28: instance of F23
    add(f23.part.mirror(Plane.YZ))


with BuildPart() as f28_6:
    # F28: instance of F27
    add(f27.part.mirror(Plane.YZ))


with BuildPart() as f30:
    # F29 (on face) → F30 (new body)
    with BuildSketch(Plane(origin=(0, 250, 0), x_dir=(-1, 0, 0), z_dir=(0, 1, 0))):
        with Locations((0, -275)):
            Rectangle(F29_W, F29_H)
    extrude(amount=F30_DEPTH)


with BuildPart() as f32:
    # F31 (on face) → F32 (new body)
    with BuildSketch(Plane(origin=(-650, 0, 0), x_dir=(0, -1, 0), z_dir=(-1, 0, 0))):
        with Locations((-7.5, -357.5)):
            Rectangle(F31_W, F31_H)
    extrude(amount=-F32_DEPTH)


with BuildPart() as f33_1:
    # F33: instance of F32
    add(f32.part.mirror(Plane.YZ))


with BuildPart() as f40:
    # F39 (on offset) → F40 (new body)
    with BuildSketch(Plane(origin=(0, 0, -341), x_dir=(1, 0, 0), z_dir=(0, 0, -1))):
        Polygon((654.4221624106, 231.1809549509), (650.6431698799, -399.4338214397), (844.8856899004, -399.4338214397), (847.5211858749, 40.3613597155), align=None)
    extrude(amount=F40_DEPTH)


with BuildPart() as f42:
    # F41 (on face) → F42 (new body)
    with BuildSketch(Plane(origin=(847.2488929893, 5.0771839769, 0), x_dir=(-0.0059924455, 0.9999820451, 0), z_dir=(0.9999820451, 0.0059924455, 0))):
        with Locations((174.4621793297, -353.5)):
            Rectangle(F41_W, F41_H)
    extrude(amount=-F42_DEPTH)


with BuildPart() as f44:
    # F43 (on face) → F44 (new body)
    with BuildSketch(Plane(origin=(0, 0, -166), x_dir=(1, 0, 0), z_dir=(0, 0, -1))):
        with Locations((0, 62.499973774)):
            Rectangle(F43_W, F43_H)
    extrude(amount=F44_DEPTH)


solid = Compound([f1.part, f7.part, f11.part, f17.part, f19.part, f21.part, f23.part, f25.part, f27.part, f28_1.part, f28_2.part, f28_3.part, f28_4.part, f28_5.part, f28_6.part, f30.part, f32.part, f33_1.part, f40.part, f42.part, f44.part])
